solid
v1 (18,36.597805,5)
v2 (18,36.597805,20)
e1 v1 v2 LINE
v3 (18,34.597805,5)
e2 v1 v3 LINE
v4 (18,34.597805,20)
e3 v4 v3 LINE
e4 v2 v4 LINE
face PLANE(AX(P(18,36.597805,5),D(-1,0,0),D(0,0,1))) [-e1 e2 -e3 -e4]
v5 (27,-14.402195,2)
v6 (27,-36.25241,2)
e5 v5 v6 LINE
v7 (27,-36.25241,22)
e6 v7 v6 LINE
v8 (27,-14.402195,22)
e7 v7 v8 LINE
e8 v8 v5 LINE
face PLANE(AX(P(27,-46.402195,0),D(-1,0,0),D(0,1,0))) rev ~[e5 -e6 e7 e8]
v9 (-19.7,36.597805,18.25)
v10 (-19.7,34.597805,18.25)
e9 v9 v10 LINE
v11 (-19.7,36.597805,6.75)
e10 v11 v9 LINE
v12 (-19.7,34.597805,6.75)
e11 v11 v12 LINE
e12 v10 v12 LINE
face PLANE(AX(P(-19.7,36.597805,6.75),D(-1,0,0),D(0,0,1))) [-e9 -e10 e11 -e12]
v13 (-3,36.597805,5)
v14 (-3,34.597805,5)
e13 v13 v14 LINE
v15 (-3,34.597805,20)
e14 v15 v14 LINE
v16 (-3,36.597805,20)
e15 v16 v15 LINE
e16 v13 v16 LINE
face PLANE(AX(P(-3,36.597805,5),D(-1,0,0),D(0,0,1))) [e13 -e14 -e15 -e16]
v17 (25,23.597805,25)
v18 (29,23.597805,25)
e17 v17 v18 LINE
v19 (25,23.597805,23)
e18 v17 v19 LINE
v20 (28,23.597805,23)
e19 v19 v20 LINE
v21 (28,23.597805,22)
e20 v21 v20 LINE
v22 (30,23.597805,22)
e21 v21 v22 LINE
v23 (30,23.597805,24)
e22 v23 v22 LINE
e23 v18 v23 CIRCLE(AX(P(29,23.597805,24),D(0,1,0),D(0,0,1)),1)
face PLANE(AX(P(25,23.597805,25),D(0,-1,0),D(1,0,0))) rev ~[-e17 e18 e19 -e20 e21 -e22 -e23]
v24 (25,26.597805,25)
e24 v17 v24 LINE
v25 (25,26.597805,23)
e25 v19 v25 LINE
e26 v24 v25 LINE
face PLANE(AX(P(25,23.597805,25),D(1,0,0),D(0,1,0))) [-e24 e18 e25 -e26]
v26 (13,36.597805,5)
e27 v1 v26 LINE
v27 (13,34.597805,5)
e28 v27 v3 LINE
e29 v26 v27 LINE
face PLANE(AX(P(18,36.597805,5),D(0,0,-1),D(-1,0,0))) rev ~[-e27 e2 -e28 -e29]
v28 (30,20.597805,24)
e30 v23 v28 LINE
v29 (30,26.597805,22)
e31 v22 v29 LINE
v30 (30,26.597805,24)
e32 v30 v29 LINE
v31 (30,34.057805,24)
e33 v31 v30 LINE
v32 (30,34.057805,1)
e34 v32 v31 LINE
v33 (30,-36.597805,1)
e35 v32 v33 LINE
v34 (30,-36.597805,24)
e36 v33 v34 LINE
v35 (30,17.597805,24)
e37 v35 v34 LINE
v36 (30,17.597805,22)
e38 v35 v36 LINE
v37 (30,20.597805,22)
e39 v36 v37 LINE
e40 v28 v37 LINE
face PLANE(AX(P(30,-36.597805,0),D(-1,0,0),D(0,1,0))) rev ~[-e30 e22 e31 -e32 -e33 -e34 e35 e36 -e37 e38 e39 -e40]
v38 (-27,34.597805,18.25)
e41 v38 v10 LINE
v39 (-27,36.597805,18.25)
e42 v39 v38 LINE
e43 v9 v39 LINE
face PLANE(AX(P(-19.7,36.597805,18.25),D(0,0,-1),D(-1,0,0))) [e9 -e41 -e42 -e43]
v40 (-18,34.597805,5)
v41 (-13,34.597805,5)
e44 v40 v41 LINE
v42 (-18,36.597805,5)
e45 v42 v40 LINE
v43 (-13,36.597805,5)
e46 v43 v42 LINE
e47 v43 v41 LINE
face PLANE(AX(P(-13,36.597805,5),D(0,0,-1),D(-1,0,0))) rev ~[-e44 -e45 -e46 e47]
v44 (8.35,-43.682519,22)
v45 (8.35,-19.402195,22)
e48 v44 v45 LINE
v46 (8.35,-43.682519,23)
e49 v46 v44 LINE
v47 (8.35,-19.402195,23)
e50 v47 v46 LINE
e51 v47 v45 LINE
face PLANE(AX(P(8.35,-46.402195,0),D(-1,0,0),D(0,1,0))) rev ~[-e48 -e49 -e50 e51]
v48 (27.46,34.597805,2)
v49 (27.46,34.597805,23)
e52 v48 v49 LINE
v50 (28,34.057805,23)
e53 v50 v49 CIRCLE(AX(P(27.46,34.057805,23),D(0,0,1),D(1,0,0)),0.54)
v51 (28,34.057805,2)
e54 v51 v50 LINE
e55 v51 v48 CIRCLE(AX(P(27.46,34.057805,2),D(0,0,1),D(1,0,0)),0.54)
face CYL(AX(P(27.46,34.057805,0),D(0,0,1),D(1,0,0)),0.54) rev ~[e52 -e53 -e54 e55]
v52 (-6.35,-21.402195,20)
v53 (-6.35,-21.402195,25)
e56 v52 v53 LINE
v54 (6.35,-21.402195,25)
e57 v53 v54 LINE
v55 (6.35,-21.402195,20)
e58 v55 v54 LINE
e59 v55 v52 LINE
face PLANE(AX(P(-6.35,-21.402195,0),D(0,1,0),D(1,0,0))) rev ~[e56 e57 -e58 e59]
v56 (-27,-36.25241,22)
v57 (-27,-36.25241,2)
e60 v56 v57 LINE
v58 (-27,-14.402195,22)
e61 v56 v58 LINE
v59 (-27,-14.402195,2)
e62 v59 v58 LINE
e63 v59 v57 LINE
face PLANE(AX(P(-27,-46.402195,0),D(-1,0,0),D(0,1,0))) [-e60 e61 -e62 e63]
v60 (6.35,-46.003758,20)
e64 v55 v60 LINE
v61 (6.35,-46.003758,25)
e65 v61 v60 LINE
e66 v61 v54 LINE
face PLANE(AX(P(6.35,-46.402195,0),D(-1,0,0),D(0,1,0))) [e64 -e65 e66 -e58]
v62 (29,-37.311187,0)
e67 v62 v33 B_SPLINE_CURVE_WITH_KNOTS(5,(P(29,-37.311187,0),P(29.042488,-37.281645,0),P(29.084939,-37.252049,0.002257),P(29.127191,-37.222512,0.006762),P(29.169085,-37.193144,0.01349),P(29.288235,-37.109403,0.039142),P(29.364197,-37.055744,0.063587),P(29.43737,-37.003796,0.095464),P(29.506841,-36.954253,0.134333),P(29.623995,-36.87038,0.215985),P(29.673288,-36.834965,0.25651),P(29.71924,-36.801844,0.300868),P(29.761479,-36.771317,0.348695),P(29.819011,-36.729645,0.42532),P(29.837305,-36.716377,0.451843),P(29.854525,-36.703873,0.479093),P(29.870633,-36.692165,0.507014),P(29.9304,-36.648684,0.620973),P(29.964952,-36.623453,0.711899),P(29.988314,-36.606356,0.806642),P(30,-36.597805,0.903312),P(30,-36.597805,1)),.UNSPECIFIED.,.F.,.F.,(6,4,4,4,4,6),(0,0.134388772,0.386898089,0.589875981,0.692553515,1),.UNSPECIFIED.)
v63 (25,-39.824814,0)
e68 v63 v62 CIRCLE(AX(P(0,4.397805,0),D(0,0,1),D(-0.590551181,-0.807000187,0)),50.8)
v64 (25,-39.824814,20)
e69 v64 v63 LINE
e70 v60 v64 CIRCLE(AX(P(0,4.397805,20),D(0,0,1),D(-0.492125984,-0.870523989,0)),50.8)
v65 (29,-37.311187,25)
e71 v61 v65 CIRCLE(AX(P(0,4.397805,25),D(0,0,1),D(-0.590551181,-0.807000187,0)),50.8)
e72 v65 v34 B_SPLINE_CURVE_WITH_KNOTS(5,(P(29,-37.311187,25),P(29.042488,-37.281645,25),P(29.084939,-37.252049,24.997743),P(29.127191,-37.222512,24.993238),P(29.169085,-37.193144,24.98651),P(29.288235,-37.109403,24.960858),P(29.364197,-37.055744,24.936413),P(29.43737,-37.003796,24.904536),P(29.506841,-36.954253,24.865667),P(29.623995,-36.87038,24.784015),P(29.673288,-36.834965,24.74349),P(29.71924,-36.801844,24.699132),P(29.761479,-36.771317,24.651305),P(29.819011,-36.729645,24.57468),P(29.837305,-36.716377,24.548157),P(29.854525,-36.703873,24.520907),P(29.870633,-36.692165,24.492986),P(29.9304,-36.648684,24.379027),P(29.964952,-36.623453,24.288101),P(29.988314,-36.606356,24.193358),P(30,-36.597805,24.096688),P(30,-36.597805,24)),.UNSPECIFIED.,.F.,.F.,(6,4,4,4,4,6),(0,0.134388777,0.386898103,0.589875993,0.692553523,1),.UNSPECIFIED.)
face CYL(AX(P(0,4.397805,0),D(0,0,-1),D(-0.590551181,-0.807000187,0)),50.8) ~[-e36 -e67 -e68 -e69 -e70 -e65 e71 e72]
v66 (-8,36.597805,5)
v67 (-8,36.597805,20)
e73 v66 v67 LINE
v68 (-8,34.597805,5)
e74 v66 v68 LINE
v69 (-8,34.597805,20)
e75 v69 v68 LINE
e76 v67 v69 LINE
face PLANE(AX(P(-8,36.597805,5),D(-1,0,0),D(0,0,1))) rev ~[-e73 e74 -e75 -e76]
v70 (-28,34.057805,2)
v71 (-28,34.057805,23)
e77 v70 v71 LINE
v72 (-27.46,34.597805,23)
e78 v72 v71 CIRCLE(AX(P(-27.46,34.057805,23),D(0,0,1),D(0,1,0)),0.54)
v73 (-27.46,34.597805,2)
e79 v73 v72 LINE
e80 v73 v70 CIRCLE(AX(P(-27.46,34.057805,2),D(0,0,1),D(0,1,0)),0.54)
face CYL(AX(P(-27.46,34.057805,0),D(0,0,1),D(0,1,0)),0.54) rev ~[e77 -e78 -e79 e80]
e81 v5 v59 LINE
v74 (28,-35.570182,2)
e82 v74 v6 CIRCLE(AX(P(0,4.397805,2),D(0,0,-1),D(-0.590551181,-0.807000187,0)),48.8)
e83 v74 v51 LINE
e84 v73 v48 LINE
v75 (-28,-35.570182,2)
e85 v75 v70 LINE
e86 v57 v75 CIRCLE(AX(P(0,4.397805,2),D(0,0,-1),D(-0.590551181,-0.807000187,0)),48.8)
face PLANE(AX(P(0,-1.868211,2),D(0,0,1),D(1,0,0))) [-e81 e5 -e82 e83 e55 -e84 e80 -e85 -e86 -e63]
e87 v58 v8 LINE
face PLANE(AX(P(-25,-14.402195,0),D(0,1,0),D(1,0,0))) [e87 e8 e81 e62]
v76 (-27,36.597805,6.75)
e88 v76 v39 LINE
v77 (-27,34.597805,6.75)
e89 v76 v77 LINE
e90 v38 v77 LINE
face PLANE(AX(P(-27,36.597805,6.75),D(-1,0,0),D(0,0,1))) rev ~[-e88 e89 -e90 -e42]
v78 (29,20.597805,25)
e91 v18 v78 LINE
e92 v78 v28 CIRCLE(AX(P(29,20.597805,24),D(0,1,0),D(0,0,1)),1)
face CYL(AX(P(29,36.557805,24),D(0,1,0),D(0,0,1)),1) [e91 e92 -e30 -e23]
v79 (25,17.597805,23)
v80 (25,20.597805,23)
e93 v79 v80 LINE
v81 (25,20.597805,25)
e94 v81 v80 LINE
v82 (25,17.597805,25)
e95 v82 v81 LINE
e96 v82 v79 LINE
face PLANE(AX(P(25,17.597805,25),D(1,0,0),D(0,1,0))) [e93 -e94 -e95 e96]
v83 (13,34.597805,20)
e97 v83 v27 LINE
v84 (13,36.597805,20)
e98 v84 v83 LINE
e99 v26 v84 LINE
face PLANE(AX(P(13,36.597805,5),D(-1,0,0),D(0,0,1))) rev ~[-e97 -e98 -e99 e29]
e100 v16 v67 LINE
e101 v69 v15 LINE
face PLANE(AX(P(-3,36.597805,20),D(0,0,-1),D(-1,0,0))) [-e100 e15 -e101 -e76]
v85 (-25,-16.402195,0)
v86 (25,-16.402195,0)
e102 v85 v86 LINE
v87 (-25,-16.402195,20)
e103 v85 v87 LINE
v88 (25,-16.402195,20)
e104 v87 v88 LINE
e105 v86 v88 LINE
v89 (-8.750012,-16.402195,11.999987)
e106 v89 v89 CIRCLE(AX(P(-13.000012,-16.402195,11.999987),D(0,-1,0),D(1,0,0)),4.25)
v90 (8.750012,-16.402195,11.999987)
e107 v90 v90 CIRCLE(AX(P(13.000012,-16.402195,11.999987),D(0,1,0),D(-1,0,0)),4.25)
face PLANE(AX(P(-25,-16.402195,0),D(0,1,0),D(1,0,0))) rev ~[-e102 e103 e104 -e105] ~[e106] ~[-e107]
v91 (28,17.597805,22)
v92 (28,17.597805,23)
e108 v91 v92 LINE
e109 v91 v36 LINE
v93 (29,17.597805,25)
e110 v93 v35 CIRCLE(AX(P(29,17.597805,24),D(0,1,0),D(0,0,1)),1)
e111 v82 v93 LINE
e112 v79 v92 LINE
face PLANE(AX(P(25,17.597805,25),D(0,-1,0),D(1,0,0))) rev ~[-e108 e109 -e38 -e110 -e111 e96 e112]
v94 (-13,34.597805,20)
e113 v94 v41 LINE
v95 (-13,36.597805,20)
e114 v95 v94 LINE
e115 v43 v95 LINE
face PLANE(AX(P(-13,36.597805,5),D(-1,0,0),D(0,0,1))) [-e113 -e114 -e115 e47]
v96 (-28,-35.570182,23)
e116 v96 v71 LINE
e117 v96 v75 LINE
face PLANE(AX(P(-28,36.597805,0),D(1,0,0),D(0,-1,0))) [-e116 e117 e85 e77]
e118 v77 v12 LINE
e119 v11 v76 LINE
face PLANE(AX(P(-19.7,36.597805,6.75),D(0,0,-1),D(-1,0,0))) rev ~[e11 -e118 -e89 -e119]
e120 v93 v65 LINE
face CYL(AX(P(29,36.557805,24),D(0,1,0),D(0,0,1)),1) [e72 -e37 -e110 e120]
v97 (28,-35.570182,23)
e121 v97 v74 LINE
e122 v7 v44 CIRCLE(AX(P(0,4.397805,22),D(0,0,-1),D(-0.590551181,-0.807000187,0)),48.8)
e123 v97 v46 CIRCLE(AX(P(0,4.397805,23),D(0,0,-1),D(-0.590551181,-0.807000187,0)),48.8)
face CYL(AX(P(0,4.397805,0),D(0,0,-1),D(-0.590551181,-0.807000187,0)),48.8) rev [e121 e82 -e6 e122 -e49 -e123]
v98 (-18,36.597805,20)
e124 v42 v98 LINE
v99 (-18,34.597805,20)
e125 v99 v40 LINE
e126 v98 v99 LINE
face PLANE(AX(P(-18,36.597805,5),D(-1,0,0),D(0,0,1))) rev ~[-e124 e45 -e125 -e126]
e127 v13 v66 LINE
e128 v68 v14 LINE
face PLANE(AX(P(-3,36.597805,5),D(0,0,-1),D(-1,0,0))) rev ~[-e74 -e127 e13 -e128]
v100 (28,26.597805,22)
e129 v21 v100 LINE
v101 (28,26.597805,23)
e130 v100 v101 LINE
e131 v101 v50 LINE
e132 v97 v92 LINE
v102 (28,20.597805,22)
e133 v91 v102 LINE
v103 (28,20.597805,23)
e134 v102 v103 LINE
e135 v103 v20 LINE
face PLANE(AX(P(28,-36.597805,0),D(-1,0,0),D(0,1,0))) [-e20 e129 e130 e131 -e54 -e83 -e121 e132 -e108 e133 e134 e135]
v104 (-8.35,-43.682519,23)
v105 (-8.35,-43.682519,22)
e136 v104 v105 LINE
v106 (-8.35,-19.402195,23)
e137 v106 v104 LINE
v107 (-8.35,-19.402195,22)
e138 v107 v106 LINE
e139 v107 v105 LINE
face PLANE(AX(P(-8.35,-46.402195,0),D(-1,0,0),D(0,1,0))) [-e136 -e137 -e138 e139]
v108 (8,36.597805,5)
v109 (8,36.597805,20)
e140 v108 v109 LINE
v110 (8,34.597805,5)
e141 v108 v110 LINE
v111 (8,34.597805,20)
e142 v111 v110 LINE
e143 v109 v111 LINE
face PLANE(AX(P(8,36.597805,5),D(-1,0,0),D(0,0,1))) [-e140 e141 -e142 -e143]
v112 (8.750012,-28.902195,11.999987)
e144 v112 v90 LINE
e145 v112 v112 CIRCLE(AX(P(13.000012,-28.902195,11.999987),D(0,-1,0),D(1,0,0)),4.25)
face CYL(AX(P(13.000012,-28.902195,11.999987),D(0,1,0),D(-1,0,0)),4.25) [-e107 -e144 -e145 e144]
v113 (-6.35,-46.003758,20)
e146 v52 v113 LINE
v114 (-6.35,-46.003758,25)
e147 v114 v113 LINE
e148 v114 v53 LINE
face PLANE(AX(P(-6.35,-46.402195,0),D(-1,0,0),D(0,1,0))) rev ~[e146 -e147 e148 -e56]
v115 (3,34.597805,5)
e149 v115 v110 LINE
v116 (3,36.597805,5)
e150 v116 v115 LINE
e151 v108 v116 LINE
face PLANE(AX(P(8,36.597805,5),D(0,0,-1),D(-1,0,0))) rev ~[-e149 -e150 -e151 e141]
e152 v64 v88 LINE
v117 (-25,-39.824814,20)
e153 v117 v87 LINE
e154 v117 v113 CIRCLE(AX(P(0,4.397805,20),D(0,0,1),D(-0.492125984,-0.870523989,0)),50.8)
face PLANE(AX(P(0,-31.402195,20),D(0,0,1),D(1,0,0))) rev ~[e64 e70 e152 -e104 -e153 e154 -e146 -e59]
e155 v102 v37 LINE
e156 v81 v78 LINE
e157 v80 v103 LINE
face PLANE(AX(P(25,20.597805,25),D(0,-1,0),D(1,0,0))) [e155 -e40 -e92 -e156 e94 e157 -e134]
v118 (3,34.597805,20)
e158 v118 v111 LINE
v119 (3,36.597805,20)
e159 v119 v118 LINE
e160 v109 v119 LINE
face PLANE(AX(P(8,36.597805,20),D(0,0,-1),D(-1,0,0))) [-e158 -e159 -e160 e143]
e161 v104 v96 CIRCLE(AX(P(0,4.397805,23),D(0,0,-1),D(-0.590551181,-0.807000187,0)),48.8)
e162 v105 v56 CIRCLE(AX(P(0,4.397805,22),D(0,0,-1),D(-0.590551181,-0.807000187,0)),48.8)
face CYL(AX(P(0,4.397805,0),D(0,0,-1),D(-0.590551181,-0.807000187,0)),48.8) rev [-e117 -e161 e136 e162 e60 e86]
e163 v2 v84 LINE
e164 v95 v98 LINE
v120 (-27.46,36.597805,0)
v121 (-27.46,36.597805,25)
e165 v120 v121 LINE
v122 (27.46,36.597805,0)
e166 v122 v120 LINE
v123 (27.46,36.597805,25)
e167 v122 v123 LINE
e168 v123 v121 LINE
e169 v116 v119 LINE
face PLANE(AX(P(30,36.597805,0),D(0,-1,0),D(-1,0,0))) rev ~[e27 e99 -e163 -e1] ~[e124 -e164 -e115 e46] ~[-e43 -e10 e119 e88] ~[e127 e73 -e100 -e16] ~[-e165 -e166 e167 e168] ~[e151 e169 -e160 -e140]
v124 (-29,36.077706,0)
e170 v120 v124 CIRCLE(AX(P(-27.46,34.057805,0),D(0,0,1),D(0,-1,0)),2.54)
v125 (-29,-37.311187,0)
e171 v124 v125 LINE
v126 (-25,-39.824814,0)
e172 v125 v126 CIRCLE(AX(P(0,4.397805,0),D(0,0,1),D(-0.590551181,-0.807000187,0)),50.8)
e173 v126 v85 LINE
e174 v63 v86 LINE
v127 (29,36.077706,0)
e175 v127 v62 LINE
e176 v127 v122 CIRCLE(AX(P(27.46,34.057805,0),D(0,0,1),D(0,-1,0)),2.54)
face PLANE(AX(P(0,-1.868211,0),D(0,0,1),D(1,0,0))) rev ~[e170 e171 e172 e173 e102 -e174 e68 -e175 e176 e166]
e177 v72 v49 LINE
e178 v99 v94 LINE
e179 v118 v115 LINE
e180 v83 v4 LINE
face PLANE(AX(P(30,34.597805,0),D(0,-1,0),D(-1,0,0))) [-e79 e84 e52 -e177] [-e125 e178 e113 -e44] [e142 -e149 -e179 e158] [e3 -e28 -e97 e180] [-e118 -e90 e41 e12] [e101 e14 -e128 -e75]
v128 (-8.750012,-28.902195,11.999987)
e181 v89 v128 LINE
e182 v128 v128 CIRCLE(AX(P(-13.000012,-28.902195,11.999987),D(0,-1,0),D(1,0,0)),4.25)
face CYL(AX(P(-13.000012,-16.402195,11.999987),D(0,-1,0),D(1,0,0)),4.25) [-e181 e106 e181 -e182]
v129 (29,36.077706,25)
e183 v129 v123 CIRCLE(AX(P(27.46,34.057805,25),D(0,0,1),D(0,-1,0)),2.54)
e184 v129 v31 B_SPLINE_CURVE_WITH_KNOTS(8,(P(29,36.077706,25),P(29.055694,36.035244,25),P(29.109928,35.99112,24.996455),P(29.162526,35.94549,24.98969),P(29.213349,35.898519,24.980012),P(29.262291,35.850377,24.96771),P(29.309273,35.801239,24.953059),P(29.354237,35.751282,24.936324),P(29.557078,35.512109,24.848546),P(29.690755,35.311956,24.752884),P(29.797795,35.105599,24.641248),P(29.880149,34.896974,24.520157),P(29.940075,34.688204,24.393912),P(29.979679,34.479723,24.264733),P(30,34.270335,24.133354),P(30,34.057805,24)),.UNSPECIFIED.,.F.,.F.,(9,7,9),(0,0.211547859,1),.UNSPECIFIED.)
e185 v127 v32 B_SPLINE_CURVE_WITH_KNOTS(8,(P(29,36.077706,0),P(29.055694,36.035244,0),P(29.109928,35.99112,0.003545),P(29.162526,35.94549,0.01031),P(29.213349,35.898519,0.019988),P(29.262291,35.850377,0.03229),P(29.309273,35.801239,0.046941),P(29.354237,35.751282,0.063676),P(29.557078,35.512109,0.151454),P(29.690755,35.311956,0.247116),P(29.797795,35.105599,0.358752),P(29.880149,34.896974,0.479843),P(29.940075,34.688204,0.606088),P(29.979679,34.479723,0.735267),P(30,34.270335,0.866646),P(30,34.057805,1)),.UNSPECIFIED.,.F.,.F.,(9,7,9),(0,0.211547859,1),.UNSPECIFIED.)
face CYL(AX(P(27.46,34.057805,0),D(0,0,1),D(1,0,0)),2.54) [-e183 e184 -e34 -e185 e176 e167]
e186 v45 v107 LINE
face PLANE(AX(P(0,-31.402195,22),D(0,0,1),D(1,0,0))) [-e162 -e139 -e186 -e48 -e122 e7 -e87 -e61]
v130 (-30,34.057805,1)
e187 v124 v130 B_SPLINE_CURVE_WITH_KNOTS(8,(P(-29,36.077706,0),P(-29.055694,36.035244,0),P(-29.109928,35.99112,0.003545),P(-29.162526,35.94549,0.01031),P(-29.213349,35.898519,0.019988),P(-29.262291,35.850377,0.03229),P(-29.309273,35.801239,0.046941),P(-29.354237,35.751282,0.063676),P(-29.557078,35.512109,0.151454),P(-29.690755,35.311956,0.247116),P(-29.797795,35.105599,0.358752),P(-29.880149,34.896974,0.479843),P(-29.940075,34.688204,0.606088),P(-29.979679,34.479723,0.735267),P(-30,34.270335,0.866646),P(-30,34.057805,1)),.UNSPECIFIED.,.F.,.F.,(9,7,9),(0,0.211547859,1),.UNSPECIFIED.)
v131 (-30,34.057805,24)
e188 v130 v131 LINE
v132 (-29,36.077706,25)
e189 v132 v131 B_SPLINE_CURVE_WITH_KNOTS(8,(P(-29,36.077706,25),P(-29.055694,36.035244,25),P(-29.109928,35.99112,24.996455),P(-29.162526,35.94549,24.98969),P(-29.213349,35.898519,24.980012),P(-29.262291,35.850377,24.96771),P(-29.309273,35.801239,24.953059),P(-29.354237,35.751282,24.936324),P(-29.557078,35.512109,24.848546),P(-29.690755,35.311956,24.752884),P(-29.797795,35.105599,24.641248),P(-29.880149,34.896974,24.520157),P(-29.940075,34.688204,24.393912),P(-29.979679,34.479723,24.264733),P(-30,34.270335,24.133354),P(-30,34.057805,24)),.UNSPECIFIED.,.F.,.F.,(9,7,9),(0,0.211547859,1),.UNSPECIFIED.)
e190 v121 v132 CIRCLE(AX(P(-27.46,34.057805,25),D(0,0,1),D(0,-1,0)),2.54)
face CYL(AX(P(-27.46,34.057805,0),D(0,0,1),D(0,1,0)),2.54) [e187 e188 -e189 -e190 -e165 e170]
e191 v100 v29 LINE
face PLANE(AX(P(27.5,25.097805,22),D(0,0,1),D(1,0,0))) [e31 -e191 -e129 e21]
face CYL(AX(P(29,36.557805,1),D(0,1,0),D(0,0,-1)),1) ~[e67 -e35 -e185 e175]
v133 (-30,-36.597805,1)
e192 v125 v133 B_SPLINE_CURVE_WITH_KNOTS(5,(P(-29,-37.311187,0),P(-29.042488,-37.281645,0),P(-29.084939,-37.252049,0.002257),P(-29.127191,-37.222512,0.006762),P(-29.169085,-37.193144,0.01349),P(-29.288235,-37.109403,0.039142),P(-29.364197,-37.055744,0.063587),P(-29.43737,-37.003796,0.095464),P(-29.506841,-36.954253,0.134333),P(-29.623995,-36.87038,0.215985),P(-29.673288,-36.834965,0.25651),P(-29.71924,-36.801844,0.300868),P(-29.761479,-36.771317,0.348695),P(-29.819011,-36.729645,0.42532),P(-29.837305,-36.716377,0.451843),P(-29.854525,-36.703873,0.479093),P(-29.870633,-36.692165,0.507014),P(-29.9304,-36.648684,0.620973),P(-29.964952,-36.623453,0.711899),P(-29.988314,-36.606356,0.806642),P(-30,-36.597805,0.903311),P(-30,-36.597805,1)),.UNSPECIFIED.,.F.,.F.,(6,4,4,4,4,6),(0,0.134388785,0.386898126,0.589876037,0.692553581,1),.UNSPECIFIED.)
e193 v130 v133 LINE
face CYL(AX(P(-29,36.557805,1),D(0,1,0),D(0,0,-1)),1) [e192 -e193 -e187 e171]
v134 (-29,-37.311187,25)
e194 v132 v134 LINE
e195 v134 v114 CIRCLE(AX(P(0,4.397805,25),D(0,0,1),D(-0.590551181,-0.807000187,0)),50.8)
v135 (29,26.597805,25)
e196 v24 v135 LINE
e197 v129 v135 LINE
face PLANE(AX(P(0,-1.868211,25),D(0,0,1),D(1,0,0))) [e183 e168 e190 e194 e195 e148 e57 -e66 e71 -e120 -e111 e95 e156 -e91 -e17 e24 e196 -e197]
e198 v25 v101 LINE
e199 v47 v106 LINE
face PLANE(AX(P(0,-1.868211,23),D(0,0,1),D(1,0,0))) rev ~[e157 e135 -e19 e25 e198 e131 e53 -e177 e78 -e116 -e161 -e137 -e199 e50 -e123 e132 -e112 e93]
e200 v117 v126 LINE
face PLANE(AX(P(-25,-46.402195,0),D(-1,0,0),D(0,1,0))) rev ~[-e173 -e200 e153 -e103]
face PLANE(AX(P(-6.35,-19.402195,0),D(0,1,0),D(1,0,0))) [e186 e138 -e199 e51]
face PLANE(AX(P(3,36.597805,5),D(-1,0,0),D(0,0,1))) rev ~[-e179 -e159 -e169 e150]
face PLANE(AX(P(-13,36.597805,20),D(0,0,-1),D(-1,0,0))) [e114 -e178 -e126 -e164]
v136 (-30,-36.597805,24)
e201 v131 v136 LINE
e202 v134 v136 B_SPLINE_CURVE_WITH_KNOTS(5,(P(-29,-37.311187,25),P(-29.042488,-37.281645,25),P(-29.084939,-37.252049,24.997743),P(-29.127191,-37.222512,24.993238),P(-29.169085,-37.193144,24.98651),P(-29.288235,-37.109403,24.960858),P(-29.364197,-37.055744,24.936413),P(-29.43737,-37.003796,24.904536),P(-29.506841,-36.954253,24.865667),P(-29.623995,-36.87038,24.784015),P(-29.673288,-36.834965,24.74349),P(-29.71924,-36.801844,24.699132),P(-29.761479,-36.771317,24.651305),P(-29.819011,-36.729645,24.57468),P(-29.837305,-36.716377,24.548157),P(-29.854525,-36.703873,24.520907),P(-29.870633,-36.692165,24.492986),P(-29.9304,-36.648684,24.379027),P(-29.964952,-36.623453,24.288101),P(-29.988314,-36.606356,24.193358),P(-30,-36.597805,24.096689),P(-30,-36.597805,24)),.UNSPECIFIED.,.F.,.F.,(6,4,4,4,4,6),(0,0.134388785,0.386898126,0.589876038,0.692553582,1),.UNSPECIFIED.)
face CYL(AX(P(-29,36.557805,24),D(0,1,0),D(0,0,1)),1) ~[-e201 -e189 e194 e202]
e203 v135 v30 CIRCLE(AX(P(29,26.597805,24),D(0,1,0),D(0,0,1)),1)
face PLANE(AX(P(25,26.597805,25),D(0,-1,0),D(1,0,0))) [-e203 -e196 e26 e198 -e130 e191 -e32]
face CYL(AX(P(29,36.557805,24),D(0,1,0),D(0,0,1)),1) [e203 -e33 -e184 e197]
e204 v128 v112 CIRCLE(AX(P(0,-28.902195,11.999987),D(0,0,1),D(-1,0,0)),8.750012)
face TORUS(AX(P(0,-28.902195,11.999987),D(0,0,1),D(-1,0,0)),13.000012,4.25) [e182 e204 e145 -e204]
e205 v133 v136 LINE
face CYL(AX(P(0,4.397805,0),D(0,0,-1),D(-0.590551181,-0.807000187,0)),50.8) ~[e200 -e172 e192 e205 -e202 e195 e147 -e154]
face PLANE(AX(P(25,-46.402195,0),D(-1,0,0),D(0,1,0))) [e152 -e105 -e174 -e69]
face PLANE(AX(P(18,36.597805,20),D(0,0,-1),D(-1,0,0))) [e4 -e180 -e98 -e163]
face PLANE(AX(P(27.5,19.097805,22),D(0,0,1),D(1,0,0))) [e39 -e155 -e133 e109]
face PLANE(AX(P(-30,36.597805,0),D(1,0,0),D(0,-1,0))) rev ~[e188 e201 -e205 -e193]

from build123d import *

# Parameters (mm, degrees)
F1_DEPTH    = 25
F3_R        = 2.54
F4_W        = 50
F4_H        = 30
F5_DEPTH    = 20
F2_W        = 12.7
F2_H        = 25
F6_DEPTH    = 25
F7_T        = -2
F8_T1_DEPTH = 75.655609521
F10_W       = 5
F10_H       = 15
F11_DEPTH   = 10
F12_W       = 7.3
F12_H       = 11.5
F13_DEPTH   = 25.4
F16_R       = 4.25
F18_W       = 5
F18_H       = 3
F19_DEPTH   = 3


# Not quite as in the source:
# - a fillet or chamfer that OpenCascade refuses, or shapes differently, is made with other operations: its cross-section is extruded or revolved along the edge and cut away or added
# - a feature names something its author has since deleted; it is built from what else it names


with BuildPart() as f1:
    # F0 (on Top) → F1 (new body)
    with BuildSketch(Plane.XY):
        with BuildLine():
            Line((30, -36.5978047605), (30, 36.5978047605))
            Line((30, 36.5978047605), (-30, 36.5978047605))
            Line((-30, 36.5978047605), (-30, -36.5978047605))
            ThreePointArc((-30, -36.5978047605), (0, -46.4021952395), (30, -36.5978047605))
        make_face()
    extrude(amount=F1_DEPTH)

    # F3
    f3_edges = [f1.edges().sort_by_distance(p)[0] for p in [
        (-30, 36.597805, 12.5),
        (30, 36.597805, 12.5),
    ]]
    fillet(f3_edges, radius=F3_R)

    # F4 (on face) → F5 (cut)
    with BuildSketch(Plane.XY):
        with Locations((0, -31.4021952395)):
            Rectangle(F4_W, F4_H)
    extrude(amount=F5_DEPTH, mode=Mode.SUBTRACT)

    # F2 (on Top) → F6 (cut, through all)
    with BuildSketch(Plane.XY):
        with Locations((0, -33.9021952395)):
            Rectangle(F2_W, F2_H)
    extrude(amount=F6_DEPTH, mode=Mode.SUBTRACT)

    # F7 (hollow: no face is removed)
    offset(amount=F7_T, kind=Kind.INTERSECTION, mode=Mode.SUBTRACT)

    # F8: fillet of radius 1 on 4 edges, made by hand

    # F8_s2 → F8_t1 (cut)
    with BuildSketch(Plane.XZ.offset(-36.5578047605)):
        with BuildLine():
            ThreePointArc((29, 0), (29.7071067812, 0.2928932188), (30, 1))
            Line((30, 1), (30, 0))
            Line((30, 0), (29, 0))
        make_face()
        with BuildLine():
            ThreePointArc((29, 25), (29.7071067812, 24.7071067812), (30, 24))
            Line((30, 24), (30, 25))
            Line((30, 25), (29, 25))
        make_face()
        with BuildLine():
            ThreePointArc((-29, 25), (-29.7071067812, 24.7071067812), (-30, 24))
            Line((-30, 24), (-30, 25))
            Line((-30, 25), (-29, 25))
        make_face()
        with BuildLine():
            ThreePointArc((-29, 0), (-29.7071067812, 0.2928932188), (-30, 1))
            Line((-30, 1), (-30, 0))
            Line((-30, 0), (-29, 0))
        make_face()
    extrude(amount=F8_T1_DEPTH, mode=Mode.SUBTRACT)

    # F10 (on face) → F11 (cut)
    with BuildSketch(Plane(origin=(0, 36.5978047605, 0), x_dir=(-1, 0, 0), z_dir=(0, 1, 0))):
        with Locations((-15.5, 12.5)):
            Rectangle(F10_W, F10_H)
        with Locations((15.5, 12.5)):
            Rectangle(F10_W, F10_H)
        with Locations((-5.5, 12.5)):
            Rectangle(F10_W, F10_H)
        with Locations((5.5, 12.5)):
            Rectangle(F10_W, F10_H)
    extrude(amount=-F11_DEPTH, mode=Mode.SUBTRACT)

    # F12 (on face) → F13 (cut)
    with BuildSketch(Plane(origin=(0, 36.5978047605, 0), x_dir=(-1, 0, 0), z_dir=(0, 1, 0))):
        with Locations((23.35, 12.5)):
            Rectangle(F12_W, F12_H)
    extrude(amount=-F13_DEPTH, mode=Mode.SUBTRACT)

    # F17: sweep along a path in F15
    with BuildLine(Plane.XY.offset(12)) as f17_path:
        Line((-13, -16.4021952395), (-13, -28.9021952395))
        ThreePointArc((-13, -28.9021952395), (0, -41.9021952395), (13, -28.9021952395))
        Line((13, -28.9021952395), (13, -16.4021952395))
    # F16 (on face) → F17 (sweep)
    with BuildSketch(Plane.XZ.offset(16.4021952395)):
        with Locations((-13.0000123754, 11.9999870658)):
            Circle(F16_R)
    sweep(path=f17_path.line)

    # F18 (on face) → F19 (cut)
    with BuildSketch(Plane.XY.offset(25)):
        with Locations((27.5, 25.0978047605)):
            Rectangle(F18_W, F18_H)
        with Locations((27.5, 19.0978047605)):
            Rectangle(F18_W, F18_H)
    extrude(amount=-F19_DEPTH, mode=Mode.SUBTRACT)


solid = f1.part
